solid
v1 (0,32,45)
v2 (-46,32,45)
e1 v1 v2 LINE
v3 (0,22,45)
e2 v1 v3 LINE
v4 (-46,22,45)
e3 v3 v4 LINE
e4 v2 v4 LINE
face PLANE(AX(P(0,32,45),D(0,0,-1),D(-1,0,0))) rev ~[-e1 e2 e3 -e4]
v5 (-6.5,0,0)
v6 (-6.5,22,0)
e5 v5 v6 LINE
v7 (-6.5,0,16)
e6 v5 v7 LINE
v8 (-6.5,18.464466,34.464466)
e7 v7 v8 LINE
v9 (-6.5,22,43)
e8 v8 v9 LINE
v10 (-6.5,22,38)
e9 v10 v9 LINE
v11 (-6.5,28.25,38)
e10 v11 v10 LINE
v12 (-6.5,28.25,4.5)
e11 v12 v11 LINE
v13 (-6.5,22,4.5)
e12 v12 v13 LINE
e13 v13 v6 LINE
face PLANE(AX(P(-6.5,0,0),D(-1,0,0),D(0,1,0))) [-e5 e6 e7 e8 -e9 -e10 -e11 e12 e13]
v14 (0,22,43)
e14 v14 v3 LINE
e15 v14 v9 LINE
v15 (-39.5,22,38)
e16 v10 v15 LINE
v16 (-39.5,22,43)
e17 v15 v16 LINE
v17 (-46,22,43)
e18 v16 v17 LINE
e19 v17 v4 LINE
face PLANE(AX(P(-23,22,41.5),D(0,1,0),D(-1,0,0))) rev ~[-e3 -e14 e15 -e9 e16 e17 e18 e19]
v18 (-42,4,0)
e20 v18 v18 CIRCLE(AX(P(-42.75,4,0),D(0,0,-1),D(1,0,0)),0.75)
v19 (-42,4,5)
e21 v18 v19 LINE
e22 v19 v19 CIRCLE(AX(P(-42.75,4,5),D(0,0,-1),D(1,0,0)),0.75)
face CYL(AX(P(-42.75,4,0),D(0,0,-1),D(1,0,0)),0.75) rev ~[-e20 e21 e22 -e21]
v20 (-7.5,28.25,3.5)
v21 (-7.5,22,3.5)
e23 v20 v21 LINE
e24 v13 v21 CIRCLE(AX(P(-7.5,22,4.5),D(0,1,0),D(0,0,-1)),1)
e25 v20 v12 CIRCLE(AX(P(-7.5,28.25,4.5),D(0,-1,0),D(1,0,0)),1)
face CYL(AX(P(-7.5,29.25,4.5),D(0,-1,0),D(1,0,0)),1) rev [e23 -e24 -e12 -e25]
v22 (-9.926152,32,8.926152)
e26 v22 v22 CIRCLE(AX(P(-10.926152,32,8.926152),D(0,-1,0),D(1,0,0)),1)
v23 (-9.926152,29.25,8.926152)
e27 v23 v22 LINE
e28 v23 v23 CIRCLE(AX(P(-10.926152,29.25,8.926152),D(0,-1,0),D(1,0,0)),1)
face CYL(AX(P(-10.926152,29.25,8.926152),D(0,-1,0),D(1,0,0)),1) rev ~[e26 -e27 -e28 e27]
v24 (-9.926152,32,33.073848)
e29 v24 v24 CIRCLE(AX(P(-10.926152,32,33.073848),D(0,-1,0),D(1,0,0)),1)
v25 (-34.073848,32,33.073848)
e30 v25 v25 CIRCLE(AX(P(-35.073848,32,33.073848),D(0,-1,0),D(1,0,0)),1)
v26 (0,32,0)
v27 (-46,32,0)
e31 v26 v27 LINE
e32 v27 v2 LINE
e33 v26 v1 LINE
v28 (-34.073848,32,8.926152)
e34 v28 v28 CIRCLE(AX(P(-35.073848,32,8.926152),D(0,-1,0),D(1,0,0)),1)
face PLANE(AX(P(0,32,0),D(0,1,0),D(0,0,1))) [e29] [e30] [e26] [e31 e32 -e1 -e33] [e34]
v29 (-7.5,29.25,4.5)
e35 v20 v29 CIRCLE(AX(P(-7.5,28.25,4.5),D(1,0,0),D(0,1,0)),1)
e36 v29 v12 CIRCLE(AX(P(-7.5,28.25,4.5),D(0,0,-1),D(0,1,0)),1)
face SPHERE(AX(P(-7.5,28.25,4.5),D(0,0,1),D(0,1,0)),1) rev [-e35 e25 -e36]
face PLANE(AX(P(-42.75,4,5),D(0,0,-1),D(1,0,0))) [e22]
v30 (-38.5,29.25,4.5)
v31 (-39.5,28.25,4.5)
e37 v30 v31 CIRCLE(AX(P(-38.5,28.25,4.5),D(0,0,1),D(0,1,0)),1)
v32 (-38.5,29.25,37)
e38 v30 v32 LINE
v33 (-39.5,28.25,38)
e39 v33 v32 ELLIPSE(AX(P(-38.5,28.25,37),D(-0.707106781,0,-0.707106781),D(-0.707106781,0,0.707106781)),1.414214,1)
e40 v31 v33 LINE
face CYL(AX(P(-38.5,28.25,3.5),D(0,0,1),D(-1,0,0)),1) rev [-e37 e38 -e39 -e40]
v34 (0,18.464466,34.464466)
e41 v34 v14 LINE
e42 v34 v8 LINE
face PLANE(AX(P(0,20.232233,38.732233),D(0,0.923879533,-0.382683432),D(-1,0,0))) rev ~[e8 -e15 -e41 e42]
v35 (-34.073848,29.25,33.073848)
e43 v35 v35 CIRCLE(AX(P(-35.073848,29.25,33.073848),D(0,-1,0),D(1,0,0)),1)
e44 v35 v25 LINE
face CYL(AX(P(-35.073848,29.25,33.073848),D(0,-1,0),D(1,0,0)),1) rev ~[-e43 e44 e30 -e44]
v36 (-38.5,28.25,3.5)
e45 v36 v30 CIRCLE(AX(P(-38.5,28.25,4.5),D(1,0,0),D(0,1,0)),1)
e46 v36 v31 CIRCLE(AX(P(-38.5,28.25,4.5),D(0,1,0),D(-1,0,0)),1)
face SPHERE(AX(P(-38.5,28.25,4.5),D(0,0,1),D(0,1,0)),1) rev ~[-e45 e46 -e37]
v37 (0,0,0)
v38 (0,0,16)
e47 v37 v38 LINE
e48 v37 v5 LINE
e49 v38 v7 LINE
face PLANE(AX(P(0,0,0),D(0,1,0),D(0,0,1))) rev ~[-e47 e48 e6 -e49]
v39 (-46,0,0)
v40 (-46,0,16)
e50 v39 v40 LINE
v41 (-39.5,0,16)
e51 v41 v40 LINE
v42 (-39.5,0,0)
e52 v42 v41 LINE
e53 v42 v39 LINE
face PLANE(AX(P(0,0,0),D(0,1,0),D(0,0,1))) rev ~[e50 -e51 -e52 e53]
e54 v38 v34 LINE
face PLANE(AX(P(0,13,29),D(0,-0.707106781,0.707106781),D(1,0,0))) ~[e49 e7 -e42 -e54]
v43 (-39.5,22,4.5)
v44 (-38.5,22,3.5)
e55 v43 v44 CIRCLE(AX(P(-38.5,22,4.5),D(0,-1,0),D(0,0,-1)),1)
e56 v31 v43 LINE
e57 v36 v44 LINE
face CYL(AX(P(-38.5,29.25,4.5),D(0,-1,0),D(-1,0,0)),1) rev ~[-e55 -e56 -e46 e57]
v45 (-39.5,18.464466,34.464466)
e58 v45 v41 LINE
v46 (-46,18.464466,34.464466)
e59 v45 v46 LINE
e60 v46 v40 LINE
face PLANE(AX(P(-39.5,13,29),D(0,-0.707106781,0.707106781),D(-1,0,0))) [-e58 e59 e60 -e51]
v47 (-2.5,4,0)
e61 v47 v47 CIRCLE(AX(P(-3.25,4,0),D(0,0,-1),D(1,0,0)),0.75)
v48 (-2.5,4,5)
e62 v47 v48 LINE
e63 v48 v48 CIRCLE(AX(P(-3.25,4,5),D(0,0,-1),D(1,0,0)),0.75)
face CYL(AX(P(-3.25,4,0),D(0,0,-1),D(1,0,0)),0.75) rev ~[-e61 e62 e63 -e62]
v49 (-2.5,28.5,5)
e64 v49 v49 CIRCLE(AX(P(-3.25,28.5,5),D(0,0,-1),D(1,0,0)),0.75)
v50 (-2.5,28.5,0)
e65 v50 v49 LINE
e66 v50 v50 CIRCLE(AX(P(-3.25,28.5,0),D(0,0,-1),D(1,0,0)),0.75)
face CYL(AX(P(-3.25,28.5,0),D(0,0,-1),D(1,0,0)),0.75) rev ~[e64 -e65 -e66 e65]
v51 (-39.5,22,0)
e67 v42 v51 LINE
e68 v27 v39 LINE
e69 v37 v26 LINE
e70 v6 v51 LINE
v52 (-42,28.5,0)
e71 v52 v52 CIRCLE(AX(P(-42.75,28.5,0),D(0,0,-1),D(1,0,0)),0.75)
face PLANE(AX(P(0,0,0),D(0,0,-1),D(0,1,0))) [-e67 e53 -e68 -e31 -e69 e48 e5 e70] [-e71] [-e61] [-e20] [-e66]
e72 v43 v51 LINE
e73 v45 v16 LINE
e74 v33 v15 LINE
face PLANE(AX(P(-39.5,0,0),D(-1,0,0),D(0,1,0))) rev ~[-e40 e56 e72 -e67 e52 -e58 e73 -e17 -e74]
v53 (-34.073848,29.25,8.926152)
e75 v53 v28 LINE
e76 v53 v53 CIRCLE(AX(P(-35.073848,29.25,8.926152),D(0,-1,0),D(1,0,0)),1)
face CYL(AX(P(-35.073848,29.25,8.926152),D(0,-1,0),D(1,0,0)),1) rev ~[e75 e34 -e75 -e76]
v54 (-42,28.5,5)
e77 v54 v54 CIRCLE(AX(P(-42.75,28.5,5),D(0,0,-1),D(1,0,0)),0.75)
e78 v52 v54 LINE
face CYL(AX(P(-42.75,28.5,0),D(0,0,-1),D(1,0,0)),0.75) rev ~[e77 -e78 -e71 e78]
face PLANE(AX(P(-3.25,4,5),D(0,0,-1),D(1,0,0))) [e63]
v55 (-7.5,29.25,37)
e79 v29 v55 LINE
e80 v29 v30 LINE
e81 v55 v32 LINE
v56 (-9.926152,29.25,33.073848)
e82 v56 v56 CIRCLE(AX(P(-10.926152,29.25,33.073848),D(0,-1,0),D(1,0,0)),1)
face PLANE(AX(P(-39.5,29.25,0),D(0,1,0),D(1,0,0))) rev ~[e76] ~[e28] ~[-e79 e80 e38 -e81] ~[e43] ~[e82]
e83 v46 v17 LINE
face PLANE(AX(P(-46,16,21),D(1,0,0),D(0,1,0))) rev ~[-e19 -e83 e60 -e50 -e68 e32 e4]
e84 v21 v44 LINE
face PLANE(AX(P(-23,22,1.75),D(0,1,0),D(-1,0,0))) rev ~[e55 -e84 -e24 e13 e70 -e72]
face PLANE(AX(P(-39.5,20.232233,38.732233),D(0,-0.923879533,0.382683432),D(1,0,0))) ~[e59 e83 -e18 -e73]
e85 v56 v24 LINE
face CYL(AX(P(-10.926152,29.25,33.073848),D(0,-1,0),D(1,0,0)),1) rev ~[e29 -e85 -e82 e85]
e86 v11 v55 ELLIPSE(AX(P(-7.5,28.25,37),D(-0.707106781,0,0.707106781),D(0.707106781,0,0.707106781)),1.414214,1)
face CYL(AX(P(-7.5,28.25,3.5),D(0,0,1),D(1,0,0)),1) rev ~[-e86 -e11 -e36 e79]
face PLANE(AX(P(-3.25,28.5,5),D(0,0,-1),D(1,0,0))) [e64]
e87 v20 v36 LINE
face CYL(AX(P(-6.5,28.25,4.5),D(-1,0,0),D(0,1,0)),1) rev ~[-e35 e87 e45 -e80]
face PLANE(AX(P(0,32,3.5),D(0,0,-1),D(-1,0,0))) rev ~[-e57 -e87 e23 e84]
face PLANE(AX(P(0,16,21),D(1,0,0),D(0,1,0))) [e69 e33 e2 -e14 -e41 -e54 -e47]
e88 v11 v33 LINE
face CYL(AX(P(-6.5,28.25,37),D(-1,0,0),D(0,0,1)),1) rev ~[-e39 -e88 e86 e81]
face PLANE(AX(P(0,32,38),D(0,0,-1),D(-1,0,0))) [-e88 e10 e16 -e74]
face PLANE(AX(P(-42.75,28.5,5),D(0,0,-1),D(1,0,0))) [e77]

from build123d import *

# Parameters (mm, degrees)
F0_W      = 32
F0_H      = 42
F1_DEPTH  = 46
F2_W      = 33
F2_H      = 29.25
F3_DEPTH  = 42.001
F4_SIZE   = 26
F5_R      = 1
F6_DEPTH  = 25
F7_W      = 46
F7_H      = 7
F7_H_2    = 3.5
F8_DEPTH  = 10
F9_SIZE   = 5
F10_R     = 1
F11_R     = 0.75
F12_DEPTH = 5


with BuildPart() as f1:
    # F0 (on Right) → F1 (new body)
    with BuildSketch(Plane.YZ):
        with Locations((16, 21)):
            Rectangle(F0_W, F0_H)
    extrude(amount=-F1_DEPTH)

    # F2 (on Top) → F3 (cut, through all)
    with BuildSketch(Plane.XY):
        with Locations((-23, 14.625)):
            Rectangle(F2_W, F2_H)
    extrude(amount=F3_DEPTH, mode=Mode.SUBTRACT)

    # F4
    f4_edges = [f1.edges().sort_by_distance(p)[0] for p in [
        (-42.75, 0, 42),
        (-3.25, 0, 42),
    ]]
    chamfer(f4_edges, length=F4_SIZE)

    # F5 (on face) → F6 (cut)
    with BuildSketch(Plane.XZ.offset(-29.25)):
        with Locations((-35.0738482888, 33.0738482888)):
            Circle(F5_R)
        with Locations((-10.9261517112, 33.0738482888)):
            Circle(F5_R)
        with Locations((-35.0738482888, 8.9261517112)):
            Circle(F5_R)
        with Locations((-10.9261517112, 8.9261517112)):
            Circle(F5_R)
    extrude(amount=-F6_DEPTH, mode=Mode.SUBTRACT)

    # F7 (on face) → F8 (join)
    with BuildSketch(Plane(origin=(0, 32, 0), x_dir=(-1, 0, 0), z_dir=(0, 1, 0))):
        with Locations((23, 41.5)):
            Rectangle(F7_W, F7_H)
        with Locations((23, 1.75)):
            Rectangle(F7_W, F7_H_2)
    extrude(amount=-F8_DEPTH)

    # F9
    f9_edges = [f1.edges().sort_by_distance(p)[0] for p in [
        (-42.75, 22, 38),
        (-3.25, 22, 38),
    ]]
    chamfer(f9_edges, length=F9_SIZE)

    # F10
    f10_edges = [f1.edges().sort_by_distance(p)[0] for p in [
        (-39.5, 29.25, 20.75),
        (-6.5, 29.25, 20.75),
        (-23, 29.25, 38),
        (-23, 29.25, 3.5),
        (-39.5, 25.625, 3.5),
        (-6.5, 25.625, 3.5),
    ]]
    fillet(f10_edges, radius=F10_R)

    # F11 (on face) → F12 (cut)
    with BuildSketch(Plane(origin=(0, 0, 0), x_dir=(1, 0, 0), z_dir=(0, 0, -1))):
        with Locations((-42.75, -4)):
            Circle(F11_R)
        with Locations((-42.75, -28.5)):
            Circle(F11_R)
        with Locations((-3.25, -28.5)):
            Circle(F11_R)
        with Locations((-3.25, -4)):
            Circle(F11_R)
    extrude(amount=-F12_DEPTH, mode=Mode.SUBTRACT)


solid = f1.part
